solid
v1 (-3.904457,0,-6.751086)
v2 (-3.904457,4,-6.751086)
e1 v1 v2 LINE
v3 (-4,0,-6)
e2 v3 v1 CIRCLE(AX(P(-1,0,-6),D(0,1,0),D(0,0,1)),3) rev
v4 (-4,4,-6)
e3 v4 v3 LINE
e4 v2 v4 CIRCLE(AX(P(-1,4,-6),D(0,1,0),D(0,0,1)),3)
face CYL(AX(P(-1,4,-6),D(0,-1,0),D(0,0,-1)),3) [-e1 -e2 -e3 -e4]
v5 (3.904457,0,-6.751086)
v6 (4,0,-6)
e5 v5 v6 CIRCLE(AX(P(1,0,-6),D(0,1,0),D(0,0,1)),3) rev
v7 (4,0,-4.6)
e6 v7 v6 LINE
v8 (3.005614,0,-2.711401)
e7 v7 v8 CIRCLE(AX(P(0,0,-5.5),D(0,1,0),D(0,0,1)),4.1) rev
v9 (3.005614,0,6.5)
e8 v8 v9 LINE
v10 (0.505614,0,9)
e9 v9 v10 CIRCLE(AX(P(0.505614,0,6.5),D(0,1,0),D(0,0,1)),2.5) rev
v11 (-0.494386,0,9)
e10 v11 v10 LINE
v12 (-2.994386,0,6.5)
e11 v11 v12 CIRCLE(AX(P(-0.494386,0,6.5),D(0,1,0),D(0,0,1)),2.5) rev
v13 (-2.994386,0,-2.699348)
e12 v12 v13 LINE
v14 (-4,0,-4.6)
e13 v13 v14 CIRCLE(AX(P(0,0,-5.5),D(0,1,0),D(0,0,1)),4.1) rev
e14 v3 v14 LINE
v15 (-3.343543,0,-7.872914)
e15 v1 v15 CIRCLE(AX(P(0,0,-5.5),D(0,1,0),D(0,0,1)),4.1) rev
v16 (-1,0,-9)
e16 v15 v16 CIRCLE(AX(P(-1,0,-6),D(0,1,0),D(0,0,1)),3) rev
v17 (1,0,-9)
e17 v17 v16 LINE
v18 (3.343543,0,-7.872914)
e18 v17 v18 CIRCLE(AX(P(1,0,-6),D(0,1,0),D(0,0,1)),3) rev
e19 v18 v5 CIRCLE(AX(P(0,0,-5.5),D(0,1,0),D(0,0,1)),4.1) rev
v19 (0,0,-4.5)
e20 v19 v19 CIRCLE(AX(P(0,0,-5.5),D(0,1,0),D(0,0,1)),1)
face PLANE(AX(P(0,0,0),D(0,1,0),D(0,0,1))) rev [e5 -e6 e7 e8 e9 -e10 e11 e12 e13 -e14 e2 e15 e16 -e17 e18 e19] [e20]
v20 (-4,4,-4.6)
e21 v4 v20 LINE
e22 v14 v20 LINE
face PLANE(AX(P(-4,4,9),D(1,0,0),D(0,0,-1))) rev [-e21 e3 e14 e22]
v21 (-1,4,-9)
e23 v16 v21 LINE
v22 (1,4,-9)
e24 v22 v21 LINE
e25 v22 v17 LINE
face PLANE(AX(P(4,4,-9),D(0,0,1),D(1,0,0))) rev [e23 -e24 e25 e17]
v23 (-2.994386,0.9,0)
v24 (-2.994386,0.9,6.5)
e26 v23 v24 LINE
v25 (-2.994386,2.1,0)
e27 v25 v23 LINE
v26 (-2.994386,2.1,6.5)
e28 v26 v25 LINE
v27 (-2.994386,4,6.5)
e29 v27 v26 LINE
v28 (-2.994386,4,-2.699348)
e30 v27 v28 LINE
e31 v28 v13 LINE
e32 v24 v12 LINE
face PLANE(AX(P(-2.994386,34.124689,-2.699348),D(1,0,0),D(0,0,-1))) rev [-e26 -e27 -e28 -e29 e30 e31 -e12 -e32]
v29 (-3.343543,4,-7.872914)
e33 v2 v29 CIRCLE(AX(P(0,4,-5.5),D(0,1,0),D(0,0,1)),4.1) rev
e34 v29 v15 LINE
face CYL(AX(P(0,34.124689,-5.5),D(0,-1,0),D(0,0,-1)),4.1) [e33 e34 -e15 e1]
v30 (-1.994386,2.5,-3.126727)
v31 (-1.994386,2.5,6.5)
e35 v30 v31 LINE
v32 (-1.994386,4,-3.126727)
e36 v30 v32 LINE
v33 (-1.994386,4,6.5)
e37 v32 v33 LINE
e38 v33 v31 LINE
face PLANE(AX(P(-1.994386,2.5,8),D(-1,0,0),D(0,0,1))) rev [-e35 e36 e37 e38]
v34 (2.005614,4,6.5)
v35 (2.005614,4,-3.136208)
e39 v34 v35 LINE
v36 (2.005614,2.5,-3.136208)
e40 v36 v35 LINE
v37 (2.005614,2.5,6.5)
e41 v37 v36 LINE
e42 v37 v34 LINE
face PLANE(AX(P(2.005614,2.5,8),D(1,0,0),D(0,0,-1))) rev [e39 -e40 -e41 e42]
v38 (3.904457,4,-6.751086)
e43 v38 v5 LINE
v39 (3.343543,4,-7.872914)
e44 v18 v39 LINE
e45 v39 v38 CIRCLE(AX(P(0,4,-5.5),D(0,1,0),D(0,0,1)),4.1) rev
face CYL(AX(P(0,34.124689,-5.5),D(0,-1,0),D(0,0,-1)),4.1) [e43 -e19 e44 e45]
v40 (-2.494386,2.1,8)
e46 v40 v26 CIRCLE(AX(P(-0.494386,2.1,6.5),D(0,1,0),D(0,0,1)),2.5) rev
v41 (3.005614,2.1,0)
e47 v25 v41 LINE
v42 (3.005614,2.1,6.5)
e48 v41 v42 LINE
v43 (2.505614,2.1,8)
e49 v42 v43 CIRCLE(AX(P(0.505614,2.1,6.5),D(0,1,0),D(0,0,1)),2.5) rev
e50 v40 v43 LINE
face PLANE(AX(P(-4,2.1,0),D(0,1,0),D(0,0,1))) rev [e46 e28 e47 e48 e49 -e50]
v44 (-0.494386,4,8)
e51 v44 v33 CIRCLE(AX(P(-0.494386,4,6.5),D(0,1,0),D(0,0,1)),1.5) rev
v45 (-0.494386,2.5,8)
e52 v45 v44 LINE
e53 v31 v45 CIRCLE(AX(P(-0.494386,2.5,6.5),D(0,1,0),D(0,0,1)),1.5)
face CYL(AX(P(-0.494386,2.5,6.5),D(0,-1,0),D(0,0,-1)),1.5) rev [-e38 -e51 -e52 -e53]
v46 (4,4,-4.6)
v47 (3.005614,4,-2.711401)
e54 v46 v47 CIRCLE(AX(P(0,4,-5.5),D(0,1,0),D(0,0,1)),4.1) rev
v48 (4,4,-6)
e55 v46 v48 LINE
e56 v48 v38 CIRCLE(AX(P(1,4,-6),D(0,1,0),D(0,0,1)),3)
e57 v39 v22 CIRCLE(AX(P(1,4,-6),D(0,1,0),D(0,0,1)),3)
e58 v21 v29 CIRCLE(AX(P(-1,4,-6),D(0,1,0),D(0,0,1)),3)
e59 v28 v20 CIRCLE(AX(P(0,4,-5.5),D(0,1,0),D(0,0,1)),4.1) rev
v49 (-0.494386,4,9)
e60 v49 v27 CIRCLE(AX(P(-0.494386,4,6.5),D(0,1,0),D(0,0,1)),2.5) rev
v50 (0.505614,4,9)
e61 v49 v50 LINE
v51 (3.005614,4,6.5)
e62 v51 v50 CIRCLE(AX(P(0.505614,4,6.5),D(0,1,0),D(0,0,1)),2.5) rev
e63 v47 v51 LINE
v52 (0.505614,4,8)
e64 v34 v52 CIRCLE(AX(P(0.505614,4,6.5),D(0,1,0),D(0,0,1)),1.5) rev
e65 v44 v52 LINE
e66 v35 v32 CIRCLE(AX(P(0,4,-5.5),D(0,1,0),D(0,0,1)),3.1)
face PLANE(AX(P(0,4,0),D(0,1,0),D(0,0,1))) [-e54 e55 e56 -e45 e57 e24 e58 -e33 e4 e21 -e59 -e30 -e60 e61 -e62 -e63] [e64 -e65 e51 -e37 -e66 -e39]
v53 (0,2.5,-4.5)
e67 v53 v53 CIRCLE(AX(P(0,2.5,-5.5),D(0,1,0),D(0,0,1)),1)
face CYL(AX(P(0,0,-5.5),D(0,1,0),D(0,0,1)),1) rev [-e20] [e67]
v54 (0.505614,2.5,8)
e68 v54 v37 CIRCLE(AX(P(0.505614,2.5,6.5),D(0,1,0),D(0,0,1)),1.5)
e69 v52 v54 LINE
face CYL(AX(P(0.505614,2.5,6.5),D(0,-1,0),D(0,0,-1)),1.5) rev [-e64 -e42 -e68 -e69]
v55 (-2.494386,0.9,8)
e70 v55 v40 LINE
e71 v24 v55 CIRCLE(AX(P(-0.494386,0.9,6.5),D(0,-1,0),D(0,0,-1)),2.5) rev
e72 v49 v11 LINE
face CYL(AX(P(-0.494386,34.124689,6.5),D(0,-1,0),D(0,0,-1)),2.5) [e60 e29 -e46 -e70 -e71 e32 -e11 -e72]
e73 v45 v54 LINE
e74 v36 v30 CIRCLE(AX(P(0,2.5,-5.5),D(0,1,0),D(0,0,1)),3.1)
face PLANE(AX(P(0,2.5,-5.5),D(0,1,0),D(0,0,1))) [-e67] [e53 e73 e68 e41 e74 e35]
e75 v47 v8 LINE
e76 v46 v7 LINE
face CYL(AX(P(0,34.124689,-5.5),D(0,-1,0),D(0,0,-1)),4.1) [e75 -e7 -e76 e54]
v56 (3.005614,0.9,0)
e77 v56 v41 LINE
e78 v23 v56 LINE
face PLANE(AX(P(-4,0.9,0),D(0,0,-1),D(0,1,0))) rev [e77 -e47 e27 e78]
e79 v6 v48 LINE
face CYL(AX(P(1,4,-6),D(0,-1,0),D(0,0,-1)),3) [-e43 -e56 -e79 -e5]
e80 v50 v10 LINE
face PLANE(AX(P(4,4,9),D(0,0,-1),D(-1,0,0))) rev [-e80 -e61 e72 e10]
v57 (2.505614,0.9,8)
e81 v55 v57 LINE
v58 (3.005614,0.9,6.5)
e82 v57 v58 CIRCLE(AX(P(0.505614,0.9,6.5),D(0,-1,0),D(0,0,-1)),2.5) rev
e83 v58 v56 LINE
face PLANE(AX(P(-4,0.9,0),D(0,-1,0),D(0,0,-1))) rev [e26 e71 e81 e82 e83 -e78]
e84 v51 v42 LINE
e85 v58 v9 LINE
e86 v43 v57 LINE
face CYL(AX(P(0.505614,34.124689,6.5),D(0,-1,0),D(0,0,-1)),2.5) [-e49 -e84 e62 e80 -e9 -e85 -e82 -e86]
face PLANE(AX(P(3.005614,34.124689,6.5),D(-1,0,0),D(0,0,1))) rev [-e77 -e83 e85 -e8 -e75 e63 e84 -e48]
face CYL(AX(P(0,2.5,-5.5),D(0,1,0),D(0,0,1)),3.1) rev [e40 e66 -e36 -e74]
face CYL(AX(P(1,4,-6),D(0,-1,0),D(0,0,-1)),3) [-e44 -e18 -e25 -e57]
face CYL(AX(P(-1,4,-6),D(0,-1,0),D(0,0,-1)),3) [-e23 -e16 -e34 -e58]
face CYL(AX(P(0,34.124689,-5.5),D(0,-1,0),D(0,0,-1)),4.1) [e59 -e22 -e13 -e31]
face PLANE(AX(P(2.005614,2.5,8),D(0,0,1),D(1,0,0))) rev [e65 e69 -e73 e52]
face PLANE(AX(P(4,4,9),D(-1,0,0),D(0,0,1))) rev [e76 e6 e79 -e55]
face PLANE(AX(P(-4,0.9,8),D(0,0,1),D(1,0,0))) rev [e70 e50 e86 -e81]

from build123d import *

# Parameters (mm, degrees)
SKETCH_1_W          = 8
SKETCH_1_H          = 18
EXTRUDE_1_DEPTH     = 4
CUT_EXTRUDE_4_DEPTH = 1.5
SKETCH_6_W          = 8
SKETCH_6_H          = 1.2
CUT_EXTRUDE_5_DEPTH = 13.68857754
SKETCH_7_R          = 1
CUT_EXTRUDE_6_DEPTH = 11.161200716
FILLET_1_R          = 3
FILLET_2_R          = 2
FILLET_3_R          = 1.5
CUT_EXTRUDE_START   = -4
CUT_EXTRUDE_7_DEPTH = 4


# Read off the part's stored shape, not the designer's step: 切除-拉伸7
with BuildPart() as part:
    # 草图1 → 凸台-拉伸1 (new body)
    with BuildSketch(Plane(origin=(0, 0, 0), x_dir=(1, 0, 0), z_dir=(0, 1, 0))):
        Rectangle(SKETCH_1_W, SKETCH_1_H)
    extrude(amount=EXTRUDE_1_DEPTH)

    # 草图5 → 切除-拉伸4 (cut)
    with BuildSketch(Plane(origin=(0, 4, 0), x_dir=(1, 0, 0), z_dir=(0, 1, 0))):
        with BuildLine():
            Line((2.005613872, -8), (-1.994386128, -8))
            Line((-1.994386128, -8), (-1.994386128, 3.12672716))
            ThreePointArc((-1.994386128, 3.12672716), (-0.007347569, 8.599991292), (2.005613872, 3.136207921))
            Line((2.005613872, 3.136207921), (2.005613872, -8))
        make_face()
    extrude(amount=-CUT_EXTRUDE_4_DEPTH, mode=Mode.SUBTRACT)

    # 草图6 → 切除-拉伸5 (cut, through all)
    with BuildSketch(Plane(origin=(4, 0, 0), x_dir=(0, 0, -1), z_dir=(1, 0, 0))):
        with Locations((-4, 1.5)):
            Rectangle(SKETCH_6_W, SKETCH_6_H)
    extrude(amount=-CUT_EXTRUDE_5_DEPTH, mode=Mode.SUBTRACT)

    # 草图7 → 切除-拉伸6 (cut, through all)
    with BuildSketch(Plane(origin=(0, 2.5, 0), x_dir=(1, 0, 0), z_dir=(0, 1, 0))):
        with Locations(Location((0, 5.5, 0), (0, 0, 270))):
            Circle(SKETCH_7_R)
    extrude(amount=-CUT_EXTRUDE_6_DEPTH, mode=Mode.SUBTRACT)

    # 圆角1
    fillet_1_edges = [part.edges().sort_by_distance(p)[0] for p in [
        (-4, 2, -9),
        (4, 2, -9),
    ]]
    fillet(fillet_1_edges, radius=FILLET_1_R)

    # 圆角2
    # the kernel refuses this fillet: 2 mm, written as the material it takes off along each edge
    with BuildSketch(Plane(origin=(4, -5, 9), x_dir=(0, 0, -1), z_dir=(0, 1, 0)), Plane(origin=(-4, -5, 9), x_dir=(1, 0, 0), z_dir=(0, 1, 0))) as fillet_2_piece_1:
        with BuildLine():
            CenterArc((FILLET_2_R, FILLET_2_R), FILLET_2_R, 180, 90)
            Line((0, FILLET_2_R), (0, 0))
            Line((0, 0), (FILLET_2_R, 0))
        make_face()
    extrude(amount=14, mode=Mode.SUBTRACT)

    # 圆角3
    fillet_3_edges = [part.edges().sort_by_distance(p)[0] for p in [
        (2.005613872, 3.25, 8),
        (-1.994386128, 3.25, 8),
    ]]
    fillet(fillet_3_edges, radius=FILLET_3_R)

    # 切除-拉伸7 outline → 切除-拉伸7 (cut)
    with BuildSketch(Plane(origin=(0, 4, 0), x_dir=(1, 0, 0), z_dir=(0, 1, 0)).offset(CUT_EXTRUDE_START)):
        with BuildLine():
            ThreePointArc((-3.34354323, 7.872913541), (-3.683281573, 7.341640787), (-3.904456771, 6.751086459))
            ThreePointArc((-3.904456771, 6.751086459), (-3.667151483, 7.333575742), (-3.34354323, 7.872913541))
        make_face()
        with BuildLine():
            ThreePointArc((3.34354323, 7.872913541), (3.667151483, 7.333575742), (3.90445677, 6.751086459))
            ThreePointArc((3.90445677, 6.751086459), (3.683281573, 7.341640787), (3.34354323, 7.872913541))
        make_face()
        with BuildLine():
            ThreePointArc((-2.994386128, 2.699347983), (-3.62401419, 3.582574342), (-4, 4.6))
            Line((-4, 4.6), (-4, -7))
            ThreePointArc((-4, -7), (-3.414213562, -8.414213562), (-2, -9))
            Line((-2, -9), (-0.494386128, -9))
            ThreePointArc((-0.494386128, -9), (-2.262153081, -8.267766953), (-2.994386128, -6.5))
            Line((-2.994386128, -6.5), (-2.994386128, 2.699347983))
        make_face()
        with BuildLine():
            Line((4, -7), (4, 4.6))
            ThreePointArc((4, 4.6), (3.627858614, 3.589858153), (3.005613872, 2.711400845))
            Line((3.005613872, 2.711400845), (3.005613872, -6.5))
            ThreePointArc((3.005613872, -6.5), (2.273380825, -8.267766953), (0.505613872, -9))
            Line((0.505613872, -9), (2, -9))
            ThreePointArc((2, -9), (3.414213562, -8.414213562), (4, -7))
        make_face()
    extrude(amount=CUT_EXTRUDE_7_DEPTH, mode=Mode.SUBTRACT)


solid = part.part
